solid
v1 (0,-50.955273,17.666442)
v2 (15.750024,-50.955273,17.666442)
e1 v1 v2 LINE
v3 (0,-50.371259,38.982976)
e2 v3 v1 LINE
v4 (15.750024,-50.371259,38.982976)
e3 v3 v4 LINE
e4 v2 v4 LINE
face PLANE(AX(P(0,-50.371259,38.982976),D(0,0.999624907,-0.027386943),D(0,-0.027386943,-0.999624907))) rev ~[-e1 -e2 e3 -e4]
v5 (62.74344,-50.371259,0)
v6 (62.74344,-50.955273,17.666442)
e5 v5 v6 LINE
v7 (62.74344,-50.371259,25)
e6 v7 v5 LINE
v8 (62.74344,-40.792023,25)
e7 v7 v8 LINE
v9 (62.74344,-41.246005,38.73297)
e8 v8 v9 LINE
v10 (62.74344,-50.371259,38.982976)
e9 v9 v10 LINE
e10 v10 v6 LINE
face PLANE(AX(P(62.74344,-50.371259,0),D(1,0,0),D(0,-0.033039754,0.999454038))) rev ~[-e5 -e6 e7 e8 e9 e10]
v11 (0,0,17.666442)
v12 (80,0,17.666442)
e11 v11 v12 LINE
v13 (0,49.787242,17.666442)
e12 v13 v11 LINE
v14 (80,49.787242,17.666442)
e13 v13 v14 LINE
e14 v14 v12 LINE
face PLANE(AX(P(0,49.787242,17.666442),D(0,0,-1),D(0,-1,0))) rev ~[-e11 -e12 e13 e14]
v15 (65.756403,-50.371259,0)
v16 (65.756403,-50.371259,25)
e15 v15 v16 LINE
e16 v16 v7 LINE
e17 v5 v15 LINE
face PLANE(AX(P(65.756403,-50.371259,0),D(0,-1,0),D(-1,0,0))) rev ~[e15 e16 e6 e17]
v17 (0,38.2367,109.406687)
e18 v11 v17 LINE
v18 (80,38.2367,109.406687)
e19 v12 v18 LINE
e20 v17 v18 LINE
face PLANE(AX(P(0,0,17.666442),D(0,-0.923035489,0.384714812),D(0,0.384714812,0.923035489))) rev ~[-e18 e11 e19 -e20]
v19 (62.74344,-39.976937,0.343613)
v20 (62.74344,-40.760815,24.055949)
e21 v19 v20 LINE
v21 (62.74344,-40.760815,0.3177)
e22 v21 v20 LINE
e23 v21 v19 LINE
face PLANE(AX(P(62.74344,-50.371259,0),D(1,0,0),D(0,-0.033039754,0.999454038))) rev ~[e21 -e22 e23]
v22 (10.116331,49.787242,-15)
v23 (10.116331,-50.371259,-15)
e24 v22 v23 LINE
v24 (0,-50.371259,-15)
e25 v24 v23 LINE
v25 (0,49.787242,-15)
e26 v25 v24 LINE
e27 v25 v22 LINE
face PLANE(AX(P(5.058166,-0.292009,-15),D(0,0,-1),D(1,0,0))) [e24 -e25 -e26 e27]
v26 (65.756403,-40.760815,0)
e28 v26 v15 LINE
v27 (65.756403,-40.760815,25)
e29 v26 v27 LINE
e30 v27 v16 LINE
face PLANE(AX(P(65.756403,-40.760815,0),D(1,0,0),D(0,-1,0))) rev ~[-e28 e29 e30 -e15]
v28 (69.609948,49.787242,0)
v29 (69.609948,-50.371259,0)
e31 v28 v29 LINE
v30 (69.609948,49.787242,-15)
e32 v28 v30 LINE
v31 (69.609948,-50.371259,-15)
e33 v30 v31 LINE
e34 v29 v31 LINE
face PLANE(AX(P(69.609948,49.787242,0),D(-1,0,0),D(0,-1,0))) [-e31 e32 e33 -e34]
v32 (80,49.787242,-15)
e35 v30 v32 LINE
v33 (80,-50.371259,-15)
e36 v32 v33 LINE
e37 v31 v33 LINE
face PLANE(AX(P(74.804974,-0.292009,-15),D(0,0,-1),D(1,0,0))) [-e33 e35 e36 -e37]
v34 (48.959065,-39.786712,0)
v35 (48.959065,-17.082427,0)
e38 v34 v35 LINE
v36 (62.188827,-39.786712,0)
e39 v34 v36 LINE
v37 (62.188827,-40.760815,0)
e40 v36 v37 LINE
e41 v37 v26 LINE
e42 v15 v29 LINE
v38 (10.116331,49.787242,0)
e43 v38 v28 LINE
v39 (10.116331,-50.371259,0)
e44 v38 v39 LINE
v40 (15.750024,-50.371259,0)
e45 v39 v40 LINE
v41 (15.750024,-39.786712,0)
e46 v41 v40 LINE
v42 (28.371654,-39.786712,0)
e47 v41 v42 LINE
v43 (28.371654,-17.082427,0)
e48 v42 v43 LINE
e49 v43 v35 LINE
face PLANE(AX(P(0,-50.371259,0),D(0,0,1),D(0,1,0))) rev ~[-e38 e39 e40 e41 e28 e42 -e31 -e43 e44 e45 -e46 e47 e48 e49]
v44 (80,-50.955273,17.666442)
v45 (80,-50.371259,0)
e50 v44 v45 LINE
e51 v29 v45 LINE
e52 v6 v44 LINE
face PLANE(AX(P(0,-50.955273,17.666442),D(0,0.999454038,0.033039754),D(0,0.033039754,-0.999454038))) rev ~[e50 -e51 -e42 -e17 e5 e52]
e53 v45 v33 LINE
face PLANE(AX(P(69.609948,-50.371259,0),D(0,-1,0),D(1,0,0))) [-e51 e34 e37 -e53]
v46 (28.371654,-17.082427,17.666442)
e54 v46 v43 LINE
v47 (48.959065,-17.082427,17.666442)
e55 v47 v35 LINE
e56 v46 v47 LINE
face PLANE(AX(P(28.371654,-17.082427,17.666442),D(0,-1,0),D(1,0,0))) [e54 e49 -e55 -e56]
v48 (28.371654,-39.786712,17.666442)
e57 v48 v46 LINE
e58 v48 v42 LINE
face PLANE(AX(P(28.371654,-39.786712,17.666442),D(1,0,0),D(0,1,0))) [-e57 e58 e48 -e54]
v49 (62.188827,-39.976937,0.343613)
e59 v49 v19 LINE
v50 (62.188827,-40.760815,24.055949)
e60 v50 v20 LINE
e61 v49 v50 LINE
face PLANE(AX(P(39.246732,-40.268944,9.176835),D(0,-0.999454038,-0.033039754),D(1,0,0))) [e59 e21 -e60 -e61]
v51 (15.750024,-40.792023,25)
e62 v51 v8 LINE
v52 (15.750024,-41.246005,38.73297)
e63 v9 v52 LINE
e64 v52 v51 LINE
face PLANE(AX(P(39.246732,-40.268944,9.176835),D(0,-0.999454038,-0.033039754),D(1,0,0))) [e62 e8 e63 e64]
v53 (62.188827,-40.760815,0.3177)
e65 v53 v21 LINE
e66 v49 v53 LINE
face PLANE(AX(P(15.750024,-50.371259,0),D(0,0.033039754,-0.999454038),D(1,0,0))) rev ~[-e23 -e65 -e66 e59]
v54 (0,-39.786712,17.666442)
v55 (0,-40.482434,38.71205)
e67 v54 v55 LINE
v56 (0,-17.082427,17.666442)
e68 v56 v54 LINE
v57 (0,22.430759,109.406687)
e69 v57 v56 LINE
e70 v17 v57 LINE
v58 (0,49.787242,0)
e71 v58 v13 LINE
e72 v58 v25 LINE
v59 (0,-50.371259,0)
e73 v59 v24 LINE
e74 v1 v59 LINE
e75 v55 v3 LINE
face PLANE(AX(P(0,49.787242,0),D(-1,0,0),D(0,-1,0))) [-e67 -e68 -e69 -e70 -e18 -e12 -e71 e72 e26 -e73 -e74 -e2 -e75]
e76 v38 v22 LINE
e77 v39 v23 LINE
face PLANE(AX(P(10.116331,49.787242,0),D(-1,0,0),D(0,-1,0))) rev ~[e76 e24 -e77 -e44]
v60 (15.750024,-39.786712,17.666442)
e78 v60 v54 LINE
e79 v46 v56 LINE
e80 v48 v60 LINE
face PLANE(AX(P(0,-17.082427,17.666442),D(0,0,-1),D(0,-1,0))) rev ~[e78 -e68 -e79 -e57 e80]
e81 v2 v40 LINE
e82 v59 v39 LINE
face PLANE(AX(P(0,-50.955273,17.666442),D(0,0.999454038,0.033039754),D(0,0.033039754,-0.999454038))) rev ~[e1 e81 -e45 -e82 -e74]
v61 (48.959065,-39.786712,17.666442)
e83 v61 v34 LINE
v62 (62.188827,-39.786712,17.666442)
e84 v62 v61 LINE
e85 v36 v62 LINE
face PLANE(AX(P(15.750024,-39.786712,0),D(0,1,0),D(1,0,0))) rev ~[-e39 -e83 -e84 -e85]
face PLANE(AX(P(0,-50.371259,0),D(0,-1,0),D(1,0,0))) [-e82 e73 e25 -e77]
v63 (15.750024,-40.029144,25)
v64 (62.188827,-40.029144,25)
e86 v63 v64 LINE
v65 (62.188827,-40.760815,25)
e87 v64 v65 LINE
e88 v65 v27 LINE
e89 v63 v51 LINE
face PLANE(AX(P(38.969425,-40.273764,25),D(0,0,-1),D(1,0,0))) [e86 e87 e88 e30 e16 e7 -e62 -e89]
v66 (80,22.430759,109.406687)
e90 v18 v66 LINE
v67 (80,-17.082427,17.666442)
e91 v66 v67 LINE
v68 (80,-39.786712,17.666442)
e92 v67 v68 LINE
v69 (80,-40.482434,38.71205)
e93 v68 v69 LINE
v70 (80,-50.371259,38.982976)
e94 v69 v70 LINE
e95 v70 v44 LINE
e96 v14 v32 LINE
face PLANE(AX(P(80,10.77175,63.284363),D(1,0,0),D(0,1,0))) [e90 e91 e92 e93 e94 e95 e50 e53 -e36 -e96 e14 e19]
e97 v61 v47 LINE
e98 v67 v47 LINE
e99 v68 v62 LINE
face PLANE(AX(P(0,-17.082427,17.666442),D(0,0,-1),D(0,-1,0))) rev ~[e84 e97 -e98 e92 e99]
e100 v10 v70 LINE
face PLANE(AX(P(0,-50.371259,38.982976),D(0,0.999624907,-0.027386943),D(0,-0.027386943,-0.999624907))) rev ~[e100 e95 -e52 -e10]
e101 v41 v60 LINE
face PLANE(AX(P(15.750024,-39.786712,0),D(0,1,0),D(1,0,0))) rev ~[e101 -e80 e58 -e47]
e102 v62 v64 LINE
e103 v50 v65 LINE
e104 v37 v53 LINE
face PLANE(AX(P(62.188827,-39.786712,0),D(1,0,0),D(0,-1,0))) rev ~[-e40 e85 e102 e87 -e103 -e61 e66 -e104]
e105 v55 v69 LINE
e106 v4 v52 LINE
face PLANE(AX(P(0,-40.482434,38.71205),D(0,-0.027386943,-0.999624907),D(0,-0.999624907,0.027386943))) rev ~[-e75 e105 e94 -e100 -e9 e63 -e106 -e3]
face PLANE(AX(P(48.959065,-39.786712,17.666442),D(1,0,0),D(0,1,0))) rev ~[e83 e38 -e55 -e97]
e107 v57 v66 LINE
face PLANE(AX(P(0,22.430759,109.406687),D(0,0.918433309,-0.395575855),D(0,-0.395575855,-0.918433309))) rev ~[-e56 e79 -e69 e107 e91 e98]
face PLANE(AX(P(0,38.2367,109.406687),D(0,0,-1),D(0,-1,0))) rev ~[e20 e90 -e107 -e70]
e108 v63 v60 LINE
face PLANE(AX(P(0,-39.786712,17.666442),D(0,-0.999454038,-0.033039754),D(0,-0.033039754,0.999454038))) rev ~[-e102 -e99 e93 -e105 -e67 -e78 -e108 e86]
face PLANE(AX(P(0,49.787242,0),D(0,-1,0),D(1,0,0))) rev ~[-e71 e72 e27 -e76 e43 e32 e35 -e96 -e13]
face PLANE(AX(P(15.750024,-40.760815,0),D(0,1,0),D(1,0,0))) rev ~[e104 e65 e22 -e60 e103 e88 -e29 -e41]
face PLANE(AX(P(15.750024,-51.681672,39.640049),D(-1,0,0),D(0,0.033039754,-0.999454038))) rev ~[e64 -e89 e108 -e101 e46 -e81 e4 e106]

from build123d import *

# Parameters (mm, degrees)
F1_DEPTH  = 80
F2_W      = 10.1163312793
F2_H      = 100.1585014164
F2_W_2    = 10.3900524974
F3_DEPTH  = 15
F6_W      = 19.9106484652
F6_H      = 22.7042857278
F7_DEPTH  = 17.6
F8_W      = 20.5874107778
F8_H      = 22.7042857278
F9_DEPTH  = 17.7
F10_W     = 46.9934158027
F10_H     = 17.6760927897
F10_H_2   = 21.9856097649
F11_DEPTH = 10.4
F13_DEPTH = 25
F15_DEPTH = 25


# Not quite as in the source:
# - a feature of the source that left no trace in its solid (it failed there, or was rolled back) is left out


with BuildPart() as f1:
    # F0 (on Right) → F1 (new body)
    with BuildSketch(Plane.YZ):
        Polygon((22.4307589233, 109.4066873193), (-17.082426697, 17.6664423198), (0, 17.6664423198), (38.2366999984, 109.4066873193), align=None)
        Polygon((-39.7867124248, 17.6664423198), (-39.2026986647, 0), (49.7872419655, 0), (49.7872419655, 17.6664423198), (0, 17.6664423198), (-17.082426697, 17.6664423198), align=None)
        Polygon((-50.955273211, 17.6664423198), (-50.3712594509, 0), (-39.2026986647, 0), (-39.7867124248, 17.6664423198), align=None)
        Polygon((-50.3712594509, 38.982976228), (-50.955273211, 17.6664423198), (-39.7867124248, 17.6664423198), (-40.4824339626, 38.7120499047), align=None)
    extrude(amount=F1_DEPTH)

    # F2 (on face) → F3 (join)
    with BuildSketch(Plane(origin=(0, 0, 0), x_dir=(1, 0, 0), z_dir=(0, 0, -1))):
        with Locations((5.0581656396, 0.2920087427)):
            Rectangle(F2_W, F2_H)
        with Locations((74.8049737513, 0.2920087427)):
            Rectangle(F2_W_2, F2_H)
    extrude(amount=F3_DEPTH)

    # F6 (on face) → F7 (join)
    with BuildSketch(Plane.XY.offset(17.6664423198)):
        with Locations((39.5665168762, -28.4345695609)):
            Rectangle(F6_W, F6_H)
    extrude(amount=-F7_DEPTH)

    # F8 (on face) → F9 (cut)
    with BuildSketch(Plane.XY.offset(17.6664423198)):
        with Locations((38.6653598398, -28.4345695609)):
            Rectangle(F8_W, F8_H)
    extrude(amount=-F9_DEPTH, mode=Mode.SUBTRACT)

    # F10 (on face) → F11 (cut)
    with BuildSketch(Plane(origin=(0, -50.316272907, -1.6633454095), x_dir=(1, 0, 0), z_dir=(0, -0.9994540383, -0.0330397541))):
        with Locations((39.2467323691, 10.5023004233)):
            Rectangle(F10_W, F10_H)
        with Locations((39.2467323691, 30.3331517006)):
            Rectangle(F10_W, F10_H_2)
    extrude(amount=-F11_DEPTH, mode=Mode.SUBTRACT)

    # F12 (on face) → F13 (cut)
    with BuildSketch(Plane(origin=(0, 0, 0), x_dir=(1, 0, 0), z_dir=(0, 0, -1))):
        Polygon((62.7434402704, 50.3712594509), (15.7500244677, 50.3712594509), (15.7500244677, 40.7608151436), (65.7564029098, 40.7608151436), (65.7564029098, 50.3712594509), align=None)
    extrude(amount=-F13_DEPTH, mode=Mode.SUBTRACT)

    # F14 (on face) → F15 (cut)
    with BuildSketch(Plane(origin=(0, 0, 0), x_dir=(1, 0, 0), z_dir=(0, 0, -1))):
        Polygon((62.1888265014, 40.7608151436), (15.7500244677, 40.7608151436), (15.7500244677, 39.7867124248), (28.3716544509, 39.7867124248), (48.9590652287, 39.7867124248), (62.1888265014, 39.7867124248), align=None)
    extrude(amount=-F15_DEPTH, mode=Mode.SUBTRACT)


solid = f1.part
